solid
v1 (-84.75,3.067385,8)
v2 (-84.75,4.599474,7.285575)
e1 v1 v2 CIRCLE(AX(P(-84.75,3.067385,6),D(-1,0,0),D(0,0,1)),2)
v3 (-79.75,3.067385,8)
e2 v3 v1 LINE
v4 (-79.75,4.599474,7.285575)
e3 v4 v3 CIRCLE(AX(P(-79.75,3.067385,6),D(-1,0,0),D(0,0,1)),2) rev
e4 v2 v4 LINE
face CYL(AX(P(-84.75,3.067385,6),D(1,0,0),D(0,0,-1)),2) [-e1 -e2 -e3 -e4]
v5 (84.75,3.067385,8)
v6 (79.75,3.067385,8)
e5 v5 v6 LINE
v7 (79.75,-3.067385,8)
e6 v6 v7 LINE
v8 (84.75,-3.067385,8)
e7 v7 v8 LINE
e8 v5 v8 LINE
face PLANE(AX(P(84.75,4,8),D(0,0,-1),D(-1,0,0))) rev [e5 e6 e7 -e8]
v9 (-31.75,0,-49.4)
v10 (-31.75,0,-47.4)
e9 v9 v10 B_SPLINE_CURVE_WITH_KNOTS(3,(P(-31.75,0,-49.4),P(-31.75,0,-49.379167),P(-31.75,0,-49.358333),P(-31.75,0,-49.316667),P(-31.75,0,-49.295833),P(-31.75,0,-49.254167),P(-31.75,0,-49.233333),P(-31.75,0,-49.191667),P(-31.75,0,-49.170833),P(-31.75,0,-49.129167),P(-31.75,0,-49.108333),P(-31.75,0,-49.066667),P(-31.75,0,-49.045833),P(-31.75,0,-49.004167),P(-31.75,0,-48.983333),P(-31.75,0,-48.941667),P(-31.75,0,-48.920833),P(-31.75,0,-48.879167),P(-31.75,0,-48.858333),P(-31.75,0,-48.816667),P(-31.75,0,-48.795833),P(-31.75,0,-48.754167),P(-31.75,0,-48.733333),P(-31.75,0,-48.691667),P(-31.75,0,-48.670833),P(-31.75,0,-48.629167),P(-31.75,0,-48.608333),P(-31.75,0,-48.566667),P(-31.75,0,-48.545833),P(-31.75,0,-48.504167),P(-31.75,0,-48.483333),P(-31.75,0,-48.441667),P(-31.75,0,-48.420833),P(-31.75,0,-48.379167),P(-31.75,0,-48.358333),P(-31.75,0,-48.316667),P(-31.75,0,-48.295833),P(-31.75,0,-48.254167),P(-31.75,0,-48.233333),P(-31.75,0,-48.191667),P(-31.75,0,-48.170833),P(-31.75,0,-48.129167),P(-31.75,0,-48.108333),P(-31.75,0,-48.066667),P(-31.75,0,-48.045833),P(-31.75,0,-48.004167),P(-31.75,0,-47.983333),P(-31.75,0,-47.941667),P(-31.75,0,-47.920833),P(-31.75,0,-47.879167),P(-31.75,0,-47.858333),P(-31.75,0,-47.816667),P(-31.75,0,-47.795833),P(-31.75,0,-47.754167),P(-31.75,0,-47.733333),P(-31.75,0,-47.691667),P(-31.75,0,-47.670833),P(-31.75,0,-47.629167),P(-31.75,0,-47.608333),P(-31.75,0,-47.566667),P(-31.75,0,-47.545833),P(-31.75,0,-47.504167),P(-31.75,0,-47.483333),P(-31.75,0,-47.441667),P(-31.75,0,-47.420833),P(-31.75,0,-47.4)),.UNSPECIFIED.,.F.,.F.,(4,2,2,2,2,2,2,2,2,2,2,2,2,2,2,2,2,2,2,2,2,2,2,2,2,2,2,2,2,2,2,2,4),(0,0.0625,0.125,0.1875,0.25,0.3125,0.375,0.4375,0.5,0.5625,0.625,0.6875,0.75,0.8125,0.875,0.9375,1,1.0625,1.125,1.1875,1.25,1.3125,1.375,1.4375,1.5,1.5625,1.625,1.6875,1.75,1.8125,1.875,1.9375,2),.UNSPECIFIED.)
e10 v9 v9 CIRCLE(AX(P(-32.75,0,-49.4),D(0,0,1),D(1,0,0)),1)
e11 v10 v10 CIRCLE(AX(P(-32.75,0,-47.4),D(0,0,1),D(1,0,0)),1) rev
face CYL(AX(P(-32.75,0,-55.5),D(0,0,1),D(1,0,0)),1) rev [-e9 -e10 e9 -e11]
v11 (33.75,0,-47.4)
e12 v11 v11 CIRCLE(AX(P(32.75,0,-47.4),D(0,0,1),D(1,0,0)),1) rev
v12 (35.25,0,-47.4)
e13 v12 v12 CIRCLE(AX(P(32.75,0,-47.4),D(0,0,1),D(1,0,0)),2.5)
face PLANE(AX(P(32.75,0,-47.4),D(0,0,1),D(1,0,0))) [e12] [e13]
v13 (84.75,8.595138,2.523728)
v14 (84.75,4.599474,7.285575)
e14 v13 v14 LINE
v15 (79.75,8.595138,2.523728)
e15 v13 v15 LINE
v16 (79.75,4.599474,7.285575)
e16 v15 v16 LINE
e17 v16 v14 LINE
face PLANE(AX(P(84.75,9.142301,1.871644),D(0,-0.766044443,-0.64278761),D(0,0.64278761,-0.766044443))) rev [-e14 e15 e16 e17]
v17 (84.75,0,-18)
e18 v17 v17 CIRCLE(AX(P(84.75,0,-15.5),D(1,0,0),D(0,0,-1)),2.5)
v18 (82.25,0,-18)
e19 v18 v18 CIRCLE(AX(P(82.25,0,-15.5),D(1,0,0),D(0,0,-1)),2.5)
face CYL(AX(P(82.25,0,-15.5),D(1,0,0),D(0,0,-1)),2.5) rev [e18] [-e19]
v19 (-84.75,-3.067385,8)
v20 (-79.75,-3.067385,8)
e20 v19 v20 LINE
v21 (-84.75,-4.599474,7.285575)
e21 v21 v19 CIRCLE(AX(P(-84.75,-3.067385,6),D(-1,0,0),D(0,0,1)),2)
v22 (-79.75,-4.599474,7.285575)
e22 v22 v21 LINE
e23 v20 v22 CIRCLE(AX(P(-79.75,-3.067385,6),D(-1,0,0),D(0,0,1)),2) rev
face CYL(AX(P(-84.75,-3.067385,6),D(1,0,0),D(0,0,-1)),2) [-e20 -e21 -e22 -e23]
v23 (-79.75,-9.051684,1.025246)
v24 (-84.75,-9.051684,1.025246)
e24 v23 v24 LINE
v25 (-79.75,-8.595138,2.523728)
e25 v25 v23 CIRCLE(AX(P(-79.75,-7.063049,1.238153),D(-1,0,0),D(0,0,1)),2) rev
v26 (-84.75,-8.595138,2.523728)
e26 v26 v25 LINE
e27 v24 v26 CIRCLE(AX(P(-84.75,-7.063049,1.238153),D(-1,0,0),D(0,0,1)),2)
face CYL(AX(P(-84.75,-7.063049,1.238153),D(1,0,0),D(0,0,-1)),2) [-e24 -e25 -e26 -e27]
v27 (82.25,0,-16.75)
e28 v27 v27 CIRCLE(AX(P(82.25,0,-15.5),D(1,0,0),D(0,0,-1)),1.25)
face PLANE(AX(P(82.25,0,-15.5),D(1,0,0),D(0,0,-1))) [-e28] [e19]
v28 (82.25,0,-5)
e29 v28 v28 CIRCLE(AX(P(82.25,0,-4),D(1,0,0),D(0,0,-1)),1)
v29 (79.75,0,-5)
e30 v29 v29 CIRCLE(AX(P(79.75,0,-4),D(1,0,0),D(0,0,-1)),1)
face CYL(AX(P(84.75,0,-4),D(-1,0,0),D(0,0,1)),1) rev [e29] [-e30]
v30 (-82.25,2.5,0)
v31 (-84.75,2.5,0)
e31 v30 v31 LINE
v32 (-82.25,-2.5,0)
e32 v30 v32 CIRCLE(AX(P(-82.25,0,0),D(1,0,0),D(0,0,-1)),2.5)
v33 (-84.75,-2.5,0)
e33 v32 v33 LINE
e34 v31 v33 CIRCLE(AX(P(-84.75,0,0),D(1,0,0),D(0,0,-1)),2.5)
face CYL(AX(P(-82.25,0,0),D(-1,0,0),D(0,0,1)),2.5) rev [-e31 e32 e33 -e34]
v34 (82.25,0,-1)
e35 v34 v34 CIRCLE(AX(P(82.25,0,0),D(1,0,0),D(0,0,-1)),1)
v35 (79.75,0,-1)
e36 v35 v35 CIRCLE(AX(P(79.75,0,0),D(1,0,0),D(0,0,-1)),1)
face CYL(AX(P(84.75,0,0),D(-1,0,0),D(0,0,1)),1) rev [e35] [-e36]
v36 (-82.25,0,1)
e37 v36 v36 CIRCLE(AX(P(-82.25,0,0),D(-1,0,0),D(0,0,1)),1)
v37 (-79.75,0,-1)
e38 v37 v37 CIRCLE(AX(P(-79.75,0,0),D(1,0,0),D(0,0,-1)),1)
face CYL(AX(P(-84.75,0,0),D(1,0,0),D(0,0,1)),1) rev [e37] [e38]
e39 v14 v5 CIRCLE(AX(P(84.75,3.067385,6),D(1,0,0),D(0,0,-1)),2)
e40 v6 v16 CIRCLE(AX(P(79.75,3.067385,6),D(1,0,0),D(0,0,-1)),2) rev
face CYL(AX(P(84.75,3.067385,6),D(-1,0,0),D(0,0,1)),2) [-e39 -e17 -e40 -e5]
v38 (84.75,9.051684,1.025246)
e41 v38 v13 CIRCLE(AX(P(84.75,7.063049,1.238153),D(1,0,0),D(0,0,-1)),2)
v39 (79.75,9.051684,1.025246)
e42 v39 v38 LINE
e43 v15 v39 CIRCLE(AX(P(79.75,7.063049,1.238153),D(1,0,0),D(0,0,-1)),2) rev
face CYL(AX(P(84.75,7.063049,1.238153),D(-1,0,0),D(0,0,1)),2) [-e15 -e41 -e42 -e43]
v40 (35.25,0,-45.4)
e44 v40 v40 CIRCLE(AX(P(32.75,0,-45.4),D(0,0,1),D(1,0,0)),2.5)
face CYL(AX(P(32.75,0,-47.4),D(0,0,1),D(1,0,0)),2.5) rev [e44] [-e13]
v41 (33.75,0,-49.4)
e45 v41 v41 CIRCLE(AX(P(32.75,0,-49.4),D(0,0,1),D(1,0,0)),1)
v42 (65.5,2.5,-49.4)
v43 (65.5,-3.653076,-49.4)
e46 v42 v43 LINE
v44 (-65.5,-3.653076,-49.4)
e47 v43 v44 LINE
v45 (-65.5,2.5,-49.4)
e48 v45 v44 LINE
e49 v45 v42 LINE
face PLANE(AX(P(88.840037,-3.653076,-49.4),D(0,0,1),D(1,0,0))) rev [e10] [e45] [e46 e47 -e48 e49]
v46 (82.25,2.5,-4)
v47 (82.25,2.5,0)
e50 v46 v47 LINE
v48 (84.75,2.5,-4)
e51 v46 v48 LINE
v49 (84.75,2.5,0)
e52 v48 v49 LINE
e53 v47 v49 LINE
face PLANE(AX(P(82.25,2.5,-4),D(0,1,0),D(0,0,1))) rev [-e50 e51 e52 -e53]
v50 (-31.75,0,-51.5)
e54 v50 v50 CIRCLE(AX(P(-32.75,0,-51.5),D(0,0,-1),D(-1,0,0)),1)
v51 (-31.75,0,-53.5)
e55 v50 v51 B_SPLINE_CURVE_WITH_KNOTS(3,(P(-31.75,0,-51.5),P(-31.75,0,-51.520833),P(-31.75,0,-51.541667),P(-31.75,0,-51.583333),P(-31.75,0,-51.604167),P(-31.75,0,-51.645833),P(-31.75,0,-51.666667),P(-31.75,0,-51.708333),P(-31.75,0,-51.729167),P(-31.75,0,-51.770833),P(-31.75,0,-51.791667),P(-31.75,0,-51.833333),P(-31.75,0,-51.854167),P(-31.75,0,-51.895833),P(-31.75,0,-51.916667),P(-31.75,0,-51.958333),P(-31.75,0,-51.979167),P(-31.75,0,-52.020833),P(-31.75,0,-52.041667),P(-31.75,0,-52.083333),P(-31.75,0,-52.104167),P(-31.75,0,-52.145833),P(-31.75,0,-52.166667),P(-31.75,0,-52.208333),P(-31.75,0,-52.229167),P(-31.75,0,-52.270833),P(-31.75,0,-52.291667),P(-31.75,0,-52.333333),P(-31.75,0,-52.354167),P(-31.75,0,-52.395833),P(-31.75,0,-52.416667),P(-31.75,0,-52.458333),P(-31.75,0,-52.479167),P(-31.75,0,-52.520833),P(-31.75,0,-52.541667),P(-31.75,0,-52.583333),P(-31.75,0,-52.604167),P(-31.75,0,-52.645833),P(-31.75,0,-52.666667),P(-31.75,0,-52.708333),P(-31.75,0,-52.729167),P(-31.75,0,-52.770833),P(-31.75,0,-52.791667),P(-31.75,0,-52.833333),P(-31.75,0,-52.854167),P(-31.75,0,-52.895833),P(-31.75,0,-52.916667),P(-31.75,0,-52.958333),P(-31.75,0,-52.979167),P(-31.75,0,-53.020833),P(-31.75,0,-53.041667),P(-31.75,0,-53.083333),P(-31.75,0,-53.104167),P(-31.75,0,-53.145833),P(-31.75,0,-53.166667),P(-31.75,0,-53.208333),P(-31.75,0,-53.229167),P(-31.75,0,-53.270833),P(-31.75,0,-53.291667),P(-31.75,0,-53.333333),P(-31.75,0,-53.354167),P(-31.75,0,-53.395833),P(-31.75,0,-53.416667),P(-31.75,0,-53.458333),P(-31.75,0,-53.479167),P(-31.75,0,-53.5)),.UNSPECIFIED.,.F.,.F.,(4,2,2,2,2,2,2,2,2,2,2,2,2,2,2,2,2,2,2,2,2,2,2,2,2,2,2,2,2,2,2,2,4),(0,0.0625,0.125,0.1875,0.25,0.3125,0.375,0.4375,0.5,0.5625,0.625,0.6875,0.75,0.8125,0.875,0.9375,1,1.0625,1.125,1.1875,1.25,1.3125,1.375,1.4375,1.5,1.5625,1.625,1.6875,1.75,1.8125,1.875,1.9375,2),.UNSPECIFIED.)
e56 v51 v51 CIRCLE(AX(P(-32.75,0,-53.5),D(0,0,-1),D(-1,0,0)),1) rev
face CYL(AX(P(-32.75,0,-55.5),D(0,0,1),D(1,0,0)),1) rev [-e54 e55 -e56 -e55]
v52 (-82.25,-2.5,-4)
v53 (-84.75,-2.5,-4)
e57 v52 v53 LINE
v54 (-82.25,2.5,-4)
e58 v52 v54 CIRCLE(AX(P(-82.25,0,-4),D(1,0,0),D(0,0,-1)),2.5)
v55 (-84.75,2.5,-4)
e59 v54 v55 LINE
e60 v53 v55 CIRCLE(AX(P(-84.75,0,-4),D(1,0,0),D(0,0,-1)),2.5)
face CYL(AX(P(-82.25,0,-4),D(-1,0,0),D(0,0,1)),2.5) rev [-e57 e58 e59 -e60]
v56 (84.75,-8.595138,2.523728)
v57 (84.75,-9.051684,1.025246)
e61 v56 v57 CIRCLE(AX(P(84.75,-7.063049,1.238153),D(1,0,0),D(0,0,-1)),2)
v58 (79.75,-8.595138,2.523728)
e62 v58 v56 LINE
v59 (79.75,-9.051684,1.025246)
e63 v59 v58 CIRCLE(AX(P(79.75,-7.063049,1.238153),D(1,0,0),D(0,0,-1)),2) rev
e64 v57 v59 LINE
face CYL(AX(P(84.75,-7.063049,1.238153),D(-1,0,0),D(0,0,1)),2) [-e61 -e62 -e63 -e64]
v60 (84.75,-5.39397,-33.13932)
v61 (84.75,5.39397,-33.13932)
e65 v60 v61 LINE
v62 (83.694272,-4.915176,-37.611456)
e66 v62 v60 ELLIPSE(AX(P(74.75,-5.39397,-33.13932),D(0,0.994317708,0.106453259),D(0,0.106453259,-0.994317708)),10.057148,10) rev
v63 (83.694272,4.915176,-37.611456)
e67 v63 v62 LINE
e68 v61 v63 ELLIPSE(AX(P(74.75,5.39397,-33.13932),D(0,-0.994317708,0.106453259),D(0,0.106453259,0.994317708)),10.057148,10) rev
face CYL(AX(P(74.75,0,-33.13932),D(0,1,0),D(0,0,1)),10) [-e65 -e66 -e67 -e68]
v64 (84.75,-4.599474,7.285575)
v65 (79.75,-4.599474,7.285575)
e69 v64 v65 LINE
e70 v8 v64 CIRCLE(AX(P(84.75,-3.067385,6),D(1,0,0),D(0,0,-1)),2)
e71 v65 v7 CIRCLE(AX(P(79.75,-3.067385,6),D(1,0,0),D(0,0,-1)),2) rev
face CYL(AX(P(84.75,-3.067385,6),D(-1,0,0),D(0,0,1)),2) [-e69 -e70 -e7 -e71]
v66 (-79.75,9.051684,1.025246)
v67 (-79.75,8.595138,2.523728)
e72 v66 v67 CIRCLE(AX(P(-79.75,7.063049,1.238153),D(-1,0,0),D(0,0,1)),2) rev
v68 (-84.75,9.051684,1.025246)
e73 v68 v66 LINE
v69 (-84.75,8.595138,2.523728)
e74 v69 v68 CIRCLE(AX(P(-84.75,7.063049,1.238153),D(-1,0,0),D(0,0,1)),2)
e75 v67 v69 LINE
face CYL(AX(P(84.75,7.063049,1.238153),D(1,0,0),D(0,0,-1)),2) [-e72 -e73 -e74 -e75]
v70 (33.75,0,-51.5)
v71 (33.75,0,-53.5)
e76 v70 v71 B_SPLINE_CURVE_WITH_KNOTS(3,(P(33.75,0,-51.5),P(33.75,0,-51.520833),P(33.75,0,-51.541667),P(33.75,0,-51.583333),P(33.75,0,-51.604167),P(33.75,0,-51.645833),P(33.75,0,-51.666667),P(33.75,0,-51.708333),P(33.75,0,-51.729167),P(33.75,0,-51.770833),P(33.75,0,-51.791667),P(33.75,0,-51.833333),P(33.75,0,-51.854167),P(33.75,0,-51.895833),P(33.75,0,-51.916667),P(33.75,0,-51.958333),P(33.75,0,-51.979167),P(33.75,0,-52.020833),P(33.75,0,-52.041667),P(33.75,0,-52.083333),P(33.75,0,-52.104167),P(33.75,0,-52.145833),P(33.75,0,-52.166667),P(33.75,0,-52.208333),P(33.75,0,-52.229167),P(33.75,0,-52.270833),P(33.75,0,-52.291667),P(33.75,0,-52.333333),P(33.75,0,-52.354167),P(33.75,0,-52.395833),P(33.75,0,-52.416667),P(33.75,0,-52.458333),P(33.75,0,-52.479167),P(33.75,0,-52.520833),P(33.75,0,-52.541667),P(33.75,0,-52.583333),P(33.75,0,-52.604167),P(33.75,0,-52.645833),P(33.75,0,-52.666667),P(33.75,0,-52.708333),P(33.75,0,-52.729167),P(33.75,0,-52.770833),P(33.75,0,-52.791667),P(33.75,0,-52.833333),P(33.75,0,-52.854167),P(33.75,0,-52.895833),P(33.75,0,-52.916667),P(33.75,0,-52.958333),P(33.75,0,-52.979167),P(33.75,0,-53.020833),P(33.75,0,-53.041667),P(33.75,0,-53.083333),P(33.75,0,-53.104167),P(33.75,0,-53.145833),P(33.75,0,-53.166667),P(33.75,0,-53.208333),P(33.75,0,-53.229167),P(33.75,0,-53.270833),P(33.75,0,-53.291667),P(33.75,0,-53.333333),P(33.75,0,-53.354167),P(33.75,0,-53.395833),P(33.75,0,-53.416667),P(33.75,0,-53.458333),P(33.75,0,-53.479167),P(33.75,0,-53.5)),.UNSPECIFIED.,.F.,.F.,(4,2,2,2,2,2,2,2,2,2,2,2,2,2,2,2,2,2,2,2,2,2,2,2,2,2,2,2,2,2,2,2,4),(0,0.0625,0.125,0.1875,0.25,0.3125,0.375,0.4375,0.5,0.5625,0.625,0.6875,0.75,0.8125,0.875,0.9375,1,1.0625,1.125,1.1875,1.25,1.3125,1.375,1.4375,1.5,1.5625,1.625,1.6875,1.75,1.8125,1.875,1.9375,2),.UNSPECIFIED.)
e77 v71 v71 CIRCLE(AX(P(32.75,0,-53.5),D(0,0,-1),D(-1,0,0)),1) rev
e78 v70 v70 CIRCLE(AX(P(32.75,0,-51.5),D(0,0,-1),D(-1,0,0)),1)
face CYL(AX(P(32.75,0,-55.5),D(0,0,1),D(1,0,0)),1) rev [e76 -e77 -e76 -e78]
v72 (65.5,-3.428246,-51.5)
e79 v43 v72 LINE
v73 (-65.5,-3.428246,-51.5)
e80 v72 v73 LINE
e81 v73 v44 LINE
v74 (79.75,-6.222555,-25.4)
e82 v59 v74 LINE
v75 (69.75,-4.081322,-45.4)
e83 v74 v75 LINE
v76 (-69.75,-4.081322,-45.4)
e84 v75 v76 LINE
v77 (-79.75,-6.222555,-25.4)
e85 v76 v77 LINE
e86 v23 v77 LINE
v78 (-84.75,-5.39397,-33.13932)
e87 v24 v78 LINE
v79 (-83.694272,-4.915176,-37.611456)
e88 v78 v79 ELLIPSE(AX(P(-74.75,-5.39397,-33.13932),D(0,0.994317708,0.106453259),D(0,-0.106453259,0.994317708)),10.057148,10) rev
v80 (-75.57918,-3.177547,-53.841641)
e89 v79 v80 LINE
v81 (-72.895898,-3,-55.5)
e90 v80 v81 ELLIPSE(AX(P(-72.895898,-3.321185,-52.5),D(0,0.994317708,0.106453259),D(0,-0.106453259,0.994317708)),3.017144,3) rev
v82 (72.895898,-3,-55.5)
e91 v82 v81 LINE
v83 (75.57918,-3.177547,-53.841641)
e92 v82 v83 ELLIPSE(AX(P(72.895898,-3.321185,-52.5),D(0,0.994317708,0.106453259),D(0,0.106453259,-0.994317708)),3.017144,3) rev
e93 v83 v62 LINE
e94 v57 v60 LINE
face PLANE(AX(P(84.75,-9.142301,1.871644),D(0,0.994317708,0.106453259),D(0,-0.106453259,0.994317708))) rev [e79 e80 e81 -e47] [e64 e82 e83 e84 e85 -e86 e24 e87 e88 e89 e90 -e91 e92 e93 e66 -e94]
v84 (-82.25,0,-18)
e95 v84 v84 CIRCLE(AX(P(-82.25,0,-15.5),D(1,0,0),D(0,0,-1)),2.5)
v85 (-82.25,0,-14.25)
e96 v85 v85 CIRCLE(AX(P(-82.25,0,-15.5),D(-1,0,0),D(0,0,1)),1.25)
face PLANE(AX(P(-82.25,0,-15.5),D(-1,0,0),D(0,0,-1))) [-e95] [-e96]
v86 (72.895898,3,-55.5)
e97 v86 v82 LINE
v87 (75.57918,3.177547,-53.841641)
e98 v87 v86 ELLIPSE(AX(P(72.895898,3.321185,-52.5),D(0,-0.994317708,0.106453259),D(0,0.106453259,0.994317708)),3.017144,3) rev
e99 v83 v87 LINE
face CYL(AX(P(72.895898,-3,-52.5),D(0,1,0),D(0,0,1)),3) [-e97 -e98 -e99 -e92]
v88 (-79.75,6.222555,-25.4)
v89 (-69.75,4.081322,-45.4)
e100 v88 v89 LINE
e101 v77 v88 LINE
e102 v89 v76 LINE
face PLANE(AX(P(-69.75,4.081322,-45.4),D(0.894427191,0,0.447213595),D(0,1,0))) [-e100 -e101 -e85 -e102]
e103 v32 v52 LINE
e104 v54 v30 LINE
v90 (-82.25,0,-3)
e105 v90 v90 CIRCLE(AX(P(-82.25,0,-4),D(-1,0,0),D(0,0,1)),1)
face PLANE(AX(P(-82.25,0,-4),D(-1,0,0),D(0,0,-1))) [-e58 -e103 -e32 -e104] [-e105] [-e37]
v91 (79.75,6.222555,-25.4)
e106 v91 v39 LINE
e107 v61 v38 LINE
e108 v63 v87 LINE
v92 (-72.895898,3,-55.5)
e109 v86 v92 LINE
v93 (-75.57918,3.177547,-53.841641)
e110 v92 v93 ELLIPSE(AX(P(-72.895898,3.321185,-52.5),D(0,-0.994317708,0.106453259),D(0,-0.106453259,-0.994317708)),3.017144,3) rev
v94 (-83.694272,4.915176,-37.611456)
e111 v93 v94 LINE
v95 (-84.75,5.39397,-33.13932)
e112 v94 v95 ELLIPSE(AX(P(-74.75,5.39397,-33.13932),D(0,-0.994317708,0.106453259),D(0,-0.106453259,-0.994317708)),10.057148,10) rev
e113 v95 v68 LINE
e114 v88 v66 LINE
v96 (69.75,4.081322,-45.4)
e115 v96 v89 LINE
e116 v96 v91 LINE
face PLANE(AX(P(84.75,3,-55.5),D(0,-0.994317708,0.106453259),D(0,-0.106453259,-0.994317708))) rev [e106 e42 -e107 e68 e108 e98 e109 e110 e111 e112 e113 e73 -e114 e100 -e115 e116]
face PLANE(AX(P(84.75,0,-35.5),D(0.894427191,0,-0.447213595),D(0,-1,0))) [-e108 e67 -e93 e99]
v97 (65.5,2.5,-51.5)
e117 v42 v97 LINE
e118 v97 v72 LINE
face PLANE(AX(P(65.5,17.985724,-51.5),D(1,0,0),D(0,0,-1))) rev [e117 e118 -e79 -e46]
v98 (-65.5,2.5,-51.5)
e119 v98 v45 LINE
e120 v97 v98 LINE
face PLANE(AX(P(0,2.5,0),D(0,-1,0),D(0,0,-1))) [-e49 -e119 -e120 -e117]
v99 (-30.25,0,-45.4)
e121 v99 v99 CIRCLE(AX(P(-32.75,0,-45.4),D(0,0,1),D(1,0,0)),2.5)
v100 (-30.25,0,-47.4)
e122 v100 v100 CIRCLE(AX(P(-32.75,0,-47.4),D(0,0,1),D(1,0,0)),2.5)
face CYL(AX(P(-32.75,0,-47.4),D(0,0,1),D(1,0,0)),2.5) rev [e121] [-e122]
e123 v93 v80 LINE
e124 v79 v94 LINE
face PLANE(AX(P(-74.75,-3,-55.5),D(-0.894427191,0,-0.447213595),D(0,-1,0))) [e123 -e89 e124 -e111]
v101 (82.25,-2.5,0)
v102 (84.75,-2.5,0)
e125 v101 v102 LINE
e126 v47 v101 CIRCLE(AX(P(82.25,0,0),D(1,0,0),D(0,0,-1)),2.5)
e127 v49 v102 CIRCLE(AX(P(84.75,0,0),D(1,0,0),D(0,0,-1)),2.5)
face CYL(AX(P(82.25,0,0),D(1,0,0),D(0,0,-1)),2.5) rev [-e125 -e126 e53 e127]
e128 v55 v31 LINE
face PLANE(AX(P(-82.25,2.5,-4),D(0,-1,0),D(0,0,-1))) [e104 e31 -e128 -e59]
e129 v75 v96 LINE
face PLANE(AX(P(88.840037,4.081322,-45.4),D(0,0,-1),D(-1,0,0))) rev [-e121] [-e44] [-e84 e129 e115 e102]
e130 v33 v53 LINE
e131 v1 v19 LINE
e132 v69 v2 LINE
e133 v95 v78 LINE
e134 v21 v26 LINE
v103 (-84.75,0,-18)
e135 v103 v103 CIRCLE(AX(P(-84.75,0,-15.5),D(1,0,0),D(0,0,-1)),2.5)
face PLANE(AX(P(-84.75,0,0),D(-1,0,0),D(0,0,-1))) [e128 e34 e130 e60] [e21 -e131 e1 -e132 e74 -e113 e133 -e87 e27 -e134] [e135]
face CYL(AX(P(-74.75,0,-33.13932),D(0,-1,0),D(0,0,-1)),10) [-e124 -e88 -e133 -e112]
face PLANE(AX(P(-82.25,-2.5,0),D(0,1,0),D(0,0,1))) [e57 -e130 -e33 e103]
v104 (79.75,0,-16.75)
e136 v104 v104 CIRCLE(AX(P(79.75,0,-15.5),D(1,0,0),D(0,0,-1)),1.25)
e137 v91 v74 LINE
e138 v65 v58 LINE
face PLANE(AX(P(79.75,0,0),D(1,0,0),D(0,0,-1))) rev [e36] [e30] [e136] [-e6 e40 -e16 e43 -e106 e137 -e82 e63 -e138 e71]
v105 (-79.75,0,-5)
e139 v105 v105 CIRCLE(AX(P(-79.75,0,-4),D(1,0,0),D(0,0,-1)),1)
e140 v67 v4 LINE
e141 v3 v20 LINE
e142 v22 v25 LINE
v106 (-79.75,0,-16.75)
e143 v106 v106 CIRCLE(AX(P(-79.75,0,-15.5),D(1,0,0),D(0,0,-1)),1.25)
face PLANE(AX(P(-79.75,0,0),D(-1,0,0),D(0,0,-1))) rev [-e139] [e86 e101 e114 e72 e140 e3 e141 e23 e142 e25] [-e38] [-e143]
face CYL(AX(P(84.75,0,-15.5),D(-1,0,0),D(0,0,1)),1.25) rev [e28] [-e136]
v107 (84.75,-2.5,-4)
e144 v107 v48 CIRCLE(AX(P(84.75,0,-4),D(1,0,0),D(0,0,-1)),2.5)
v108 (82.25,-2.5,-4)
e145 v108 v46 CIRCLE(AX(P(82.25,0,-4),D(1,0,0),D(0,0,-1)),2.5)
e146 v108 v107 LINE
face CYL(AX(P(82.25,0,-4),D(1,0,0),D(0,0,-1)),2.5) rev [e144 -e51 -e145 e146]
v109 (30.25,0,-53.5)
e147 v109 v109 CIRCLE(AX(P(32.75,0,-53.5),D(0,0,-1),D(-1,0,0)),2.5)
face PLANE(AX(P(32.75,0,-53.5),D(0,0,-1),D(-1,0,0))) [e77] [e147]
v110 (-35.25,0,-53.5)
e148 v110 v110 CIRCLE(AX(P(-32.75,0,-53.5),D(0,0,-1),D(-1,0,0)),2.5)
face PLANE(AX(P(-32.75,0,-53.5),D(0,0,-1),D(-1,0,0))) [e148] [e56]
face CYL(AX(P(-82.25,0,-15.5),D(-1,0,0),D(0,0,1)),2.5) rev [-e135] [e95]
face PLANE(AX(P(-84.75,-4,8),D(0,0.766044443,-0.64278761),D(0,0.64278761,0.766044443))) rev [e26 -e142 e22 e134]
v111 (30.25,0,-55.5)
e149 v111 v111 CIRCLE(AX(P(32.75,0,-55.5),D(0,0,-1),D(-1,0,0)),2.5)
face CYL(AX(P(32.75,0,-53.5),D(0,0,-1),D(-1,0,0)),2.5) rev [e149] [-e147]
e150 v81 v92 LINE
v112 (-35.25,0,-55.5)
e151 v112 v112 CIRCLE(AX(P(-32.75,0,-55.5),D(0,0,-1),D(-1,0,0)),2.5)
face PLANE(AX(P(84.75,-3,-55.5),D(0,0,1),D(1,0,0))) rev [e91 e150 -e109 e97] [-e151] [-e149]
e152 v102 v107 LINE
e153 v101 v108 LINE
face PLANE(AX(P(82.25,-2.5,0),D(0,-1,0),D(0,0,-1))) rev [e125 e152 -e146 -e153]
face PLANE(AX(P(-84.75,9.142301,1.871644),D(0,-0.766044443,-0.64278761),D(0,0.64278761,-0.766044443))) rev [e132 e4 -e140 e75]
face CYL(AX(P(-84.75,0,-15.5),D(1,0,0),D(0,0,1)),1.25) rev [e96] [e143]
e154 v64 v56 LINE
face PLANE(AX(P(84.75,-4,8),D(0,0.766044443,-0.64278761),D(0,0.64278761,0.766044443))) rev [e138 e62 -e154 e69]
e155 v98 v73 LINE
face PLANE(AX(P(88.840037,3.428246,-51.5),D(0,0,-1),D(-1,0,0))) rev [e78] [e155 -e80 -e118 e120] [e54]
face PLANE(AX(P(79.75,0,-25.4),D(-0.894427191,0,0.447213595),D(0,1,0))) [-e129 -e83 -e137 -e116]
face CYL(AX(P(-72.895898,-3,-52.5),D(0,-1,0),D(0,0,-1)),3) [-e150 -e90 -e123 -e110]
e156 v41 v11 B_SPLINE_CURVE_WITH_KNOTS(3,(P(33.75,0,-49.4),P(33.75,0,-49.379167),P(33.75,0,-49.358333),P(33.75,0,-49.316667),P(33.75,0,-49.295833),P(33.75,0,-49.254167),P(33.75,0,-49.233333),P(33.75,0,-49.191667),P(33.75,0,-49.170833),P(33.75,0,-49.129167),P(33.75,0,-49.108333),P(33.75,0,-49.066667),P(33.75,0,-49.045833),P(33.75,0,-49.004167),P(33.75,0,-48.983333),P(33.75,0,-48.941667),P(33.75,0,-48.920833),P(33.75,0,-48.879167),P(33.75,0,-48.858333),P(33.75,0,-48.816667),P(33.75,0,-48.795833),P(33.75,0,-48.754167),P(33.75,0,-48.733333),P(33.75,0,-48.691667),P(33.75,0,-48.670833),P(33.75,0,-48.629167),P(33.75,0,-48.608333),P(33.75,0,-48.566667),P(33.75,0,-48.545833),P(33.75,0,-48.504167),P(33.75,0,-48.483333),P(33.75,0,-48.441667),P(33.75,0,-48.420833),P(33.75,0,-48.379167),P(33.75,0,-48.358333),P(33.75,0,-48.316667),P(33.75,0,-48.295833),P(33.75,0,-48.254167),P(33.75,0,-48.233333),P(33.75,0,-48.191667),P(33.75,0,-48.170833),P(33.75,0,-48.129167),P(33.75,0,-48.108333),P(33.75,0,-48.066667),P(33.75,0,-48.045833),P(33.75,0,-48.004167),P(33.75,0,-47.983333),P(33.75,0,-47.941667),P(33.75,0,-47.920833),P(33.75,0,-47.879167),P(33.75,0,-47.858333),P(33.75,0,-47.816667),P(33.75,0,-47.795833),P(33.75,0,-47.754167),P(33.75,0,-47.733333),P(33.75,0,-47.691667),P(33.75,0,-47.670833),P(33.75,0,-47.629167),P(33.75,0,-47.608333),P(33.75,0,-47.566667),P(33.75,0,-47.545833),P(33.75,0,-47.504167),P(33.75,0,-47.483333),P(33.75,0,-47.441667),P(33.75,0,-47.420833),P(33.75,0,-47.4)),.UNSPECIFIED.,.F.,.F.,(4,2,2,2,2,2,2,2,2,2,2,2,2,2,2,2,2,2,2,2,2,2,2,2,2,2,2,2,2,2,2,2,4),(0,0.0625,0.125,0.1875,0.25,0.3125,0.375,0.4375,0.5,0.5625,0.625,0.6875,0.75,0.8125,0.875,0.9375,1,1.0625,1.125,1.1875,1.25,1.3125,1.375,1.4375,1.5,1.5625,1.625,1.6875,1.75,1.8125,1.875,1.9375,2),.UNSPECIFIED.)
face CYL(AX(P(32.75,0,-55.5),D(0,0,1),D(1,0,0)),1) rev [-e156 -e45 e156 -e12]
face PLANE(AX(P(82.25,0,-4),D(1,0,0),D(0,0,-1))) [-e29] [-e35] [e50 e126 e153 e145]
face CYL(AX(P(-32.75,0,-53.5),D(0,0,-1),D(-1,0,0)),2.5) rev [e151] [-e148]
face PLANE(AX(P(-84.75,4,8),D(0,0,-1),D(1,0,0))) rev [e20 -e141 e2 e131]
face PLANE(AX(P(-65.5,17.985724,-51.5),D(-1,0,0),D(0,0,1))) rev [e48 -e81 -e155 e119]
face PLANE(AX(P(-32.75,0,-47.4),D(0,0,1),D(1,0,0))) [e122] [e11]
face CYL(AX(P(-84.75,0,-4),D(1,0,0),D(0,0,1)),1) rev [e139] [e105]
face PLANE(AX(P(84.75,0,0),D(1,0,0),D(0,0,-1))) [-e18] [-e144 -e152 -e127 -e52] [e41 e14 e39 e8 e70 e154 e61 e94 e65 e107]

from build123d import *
from OCP.BRepFilletAPI import BRepFilletAPI_MakeChamfer

# Parameters (mm, degrees)
SKETCH4_R                       = 1
SKETCH4_R_2                     = 0.9999999999999998
SKETCH4_R_3                     = 1.250000000000001
BOSS_EXTRUDE1_DEPTH             = 5
BOSS_EXTRUDE2_START             = -79.75
BOSS_EXTRUDE2_DEPTH             = 159.5
BOSS_EXTRUDE3_REACH             = 103.717
SKETCH6_W                       = 14.25
SKETCH6_H                       = 2.1000000000000014
BOSS_EXTRUDE3_DIRECTION_2_REACH = 103.717
SKETCH11_R                      = 0.9999999999999983
CUT_EXTRUDE4_DEPTH              = 101.58679916039975
SKETCH12_R                      = 2.4999999999999982
SKETCH12_R_2                    = 2.500000000000002
CUT_EXTRUDE5_DEPTH              = 2
CUT_EXTRUDE6_START              = -2
SKETCH13_R                      = 2.4999999999999982
SKETCH13_R_2                    = 2.500000000000002
CUT_EXTRUDE6_DEPTH              = 2
CHAMFER3_SIZE                   = 10
CHAMFER3_SIZE2                  = 20
CHAMFER4_SIZE                   = 20
CHAMFER4_SIZE2                  = 10
BOSS_EXTRUDE4_START             = -65.5
BOSS_EXTRUDE4_DEPTH             = 131
SKETCH15_R                      = 2.4999999999999982
CUT_EXTRUDE7_DEPTH              = 2.5
FILLET1_R                       = 2
FILLET2_R                       = 10
FILLET3_R                       = 3


# Read off the part's stored shape, not the designer's step: Boss-Extrude4
with BuildPart() as part:
    # Sketch4 → Boss-Extrude1 (new body)
    with BuildSketch(Plane(origin=(79.75, 0, 0), x_dir=(0, 0, -1), z_dir=(1, 0, 0))):
        Polygon((-7.999999999999998, 4), (-7.999999999999998, -4), (-1.87164445504816, -9.142300877492296), (55.5, -3), (55.5, 3), (-1.8716444550481652, 9.142300877492302), align=None)
        Circle(SKETCH4_R, mode=Mode.SUBTRACT)
        with Locations((4, 0)):
            Circle(SKETCH4_R_2, mode=Mode.SUBTRACT)
        with Locations((15.5, 0)):
            Circle(SKETCH4_R_3, mode=Mode.SUBTRACT)
    extrude(amount=BOSS_EXTRUDE1_DEPTH)


with BuildPart() as body_2:
    # Mirror1: mirrored copy
    add(part.part.mirror(Plane(origin=(0, 0, 0), x_dir=(0, 0, 1), z_dir=(1, 0, 0))))


with BuildPart() as part_1:
    add(part.part)

    add(body_2.part)  # Boss-Extrude2 merges body 2
    # Sketch5 → Boss-Extrude2 (add)
    with BuildSketch(Plane(origin=(0, 0, 0), x_dir=(0, 0, -1), z_dir=(1, 0, 0)).offset(BOSS_EXTRUDE2_START)):
        Polygon((51.49999999999999, 3.428246457694266), (51.49999999999999, -3.428246457694267), (55.5, -3), (55.5, 3), align=None)
        Polygon((45.4, 4.081322305678019), (45.4, -4.081322305678019), (49.39999999999999, -3.6530758479837546), (49.39999999999999, 3.6530758479837546), align=None)
    extrude(amount=BOSS_EXTRUDE2_DEPTH)

    # Boss-Extrude3: up to this plane
    boss_extrude3_end = Plane(origin=(84.75, 3, -55.5), z_dir=(0, -0.9943177075979668, 0.10645325902537786))
    # Sketch6 → Boss-Extrude3 (add, up to the surface)
    with BuildSketch(Plane(origin=(0, 0, 0), x_dir=(1, 0, 0), z_dir=(0, 1, 0)), mode=Mode.PRIVATE) as boss_extrude3_sk1:
        with Locations((-72.625, 50.44999999999999)):
            Rectangle(SKETCH6_W, SKETCH6_H)
    boss_extrude3_tool1 = split(extrude(boss_extrude3_sk1.sketch, amount=BOSS_EXTRUDE3_REACH, mode=Mode.PRIVATE), bisect_by=boss_extrude3_end, keep=Keep.BOTH, mode=Mode.PRIVATE)
    add(boss_extrude3_tool1.solids().sort_by_distance((-72.625, 0, -50.45))[0])
    # Sketch6 → Boss-Extrude3 (add, up to the surface)
    with BuildSketch(Plane(origin=(0, 0, 0), x_dir=(1, 0, 0), z_dir=(0, 1, 0)), mode=Mode.PRIVATE) as boss_extrude3_sk2:
        Polygon((65.5, 49.400000000000006), (79.75, 49.39999999999999), (79.75, 51.49999999999999), (65.5, 51.50000000000001), align=None)
    boss_extrude3_tool2 = split(extrude(boss_extrude3_sk2.sketch, amount=BOSS_EXTRUDE3_REACH, mode=Mode.PRIVATE), bisect_by=boss_extrude3_end, keep=Keep.BOTH, mode=Mode.PRIVATE)
    add(boss_extrude3_tool2.solids().sort_by_distance((72.625, 0, -50.45))[0])

    # Boss-Extrude3 direction 2: up to this plane
    boss_extrude3_direction_2_end = Plane(origin=(84.75, -9.142300877492296, 1.87164445504816), z_dir=(0, 0.9943177075979668, 0.10645325902537779))
    # Sketch6 → Boss-Extrude3 direction 2 (add, up to the surface)
    with BuildSketch(Plane(origin=(0, 0, 0), x_dir=(1, 0, 0), z_dir=(0, 1, 0)), mode=Mode.PRIVATE) as boss_extrude3_direction_2_sk1:
        with Locations((-72.625, 50.44999999999999)):
            Rectangle(SKETCH6_W, SKETCH6_H)
    boss_extrude3_direction_2_tool1 = split(extrude(boss_extrude3_direction_2_sk1.sketch, amount=-BOSS_EXTRUDE3_DIRECTION_2_REACH, mode=Mode.PRIVATE), bisect_by=boss_extrude3_direction_2_end, keep=Keep.BOTH, mode=Mode.PRIVATE)
    add(boss_extrude3_direction_2_tool1.solids().sort_by_distance((-72.625, 0, -50.45))[0])
    # Sketch6 → Boss-Extrude3 direction 2 (add, up to the surface)
    with BuildSketch(Plane(origin=(0, 0, 0), x_dir=(1, 0, 0), z_dir=(0, 1, 0)), mode=Mode.PRIVATE) as boss_extrude3_direction_2_sk2:
        Polygon((65.5, 49.400000000000006), (79.75, 49.39999999999999), (79.75, 51.49999999999999), (65.5, 51.50000000000001), align=None)
    boss_extrude3_direction_2_tool2 = split(extrude(boss_extrude3_direction_2_sk2.sketch, amount=-BOSS_EXTRUDE3_DIRECTION_2_REACH, mode=Mode.PRIVATE), bisect_by=boss_extrude3_direction_2_end, keep=Keep.BOTH, mode=Mode.PRIVATE)
    add(boss_extrude3_direction_2_tool2.solids().sort_by_distance((72.625, 0, -50.45))[0])

    # Sketch11 → Cut-Extrude4 (cut, through all)
    with BuildSketch(Plane.XY.offset(-45.4)):
        with Locations((-32.75, -1.61e-15)):
            Circle(SKETCH11_R)
        with Locations((32.75, 2.4e-15)):
            Circle(SKETCH11_R)
    extrude(amount=-CUT_EXTRUDE4_DEPTH, mode=Mode.SUBTRACT)

    # Sketch12 → Cut-Extrude5 (cut)
    with BuildSketch(Plane.XY.offset(-45.4)):
        with Locations((-32.75, -1.73e-15)):
            Circle(SKETCH12_R)
        with Locations((32.75, 3.47e-15)):
            Circle(SKETCH12_R_2)
    extrude(amount=-CUT_EXTRUDE5_DEPTH, mode=Mode.SUBTRACT)

    # Sketch13 → Cut-Extrude6 (cut)
    with BuildSketch(Plane(origin=(0, 0, -55.5), x_dir=(-1, 0, 0), z_dir=(0, 0, -1)).offset(CUT_EXTRUDE6_START)):
        with Locations(Location((-32.75, 3.47e-15, 0), (0, 0, 180))):
            Circle(SKETCH13_R)
        with Locations(Location((32.75, 0, 0), (0, 0, 180))):
            Circle(SKETCH13_R_2)
    extrude(amount=CUT_EXTRUDE6_DEPTH, mode=Mode.SUBTRACT)

    # Chamfer3: one chamfer whose edges measure the first distance from different faces: ONE call of the kernel's chamfer builder (chamfer() names one face for all edges)
    chamfer3_edges_1 = [part_1.edges().sort_by_distance(p)[0] for p in [
        (84.75, 0, -55.5),
    ]]
    chamfer3_side_1 = [part_1.faces().sort_by_distance(p)[0] for p in [
        (6.55e-15, -1.2e-16, -55.5),
    ]]
    chamfer3_edges_2 = [part_1.edges().sort_by_distance(p)[0] for p in [
        (79.75, 0, -45.4),
    ]]
    chamfer3_side_2 = [part_1.faces().sort_by_distance(p)[0] for p in [
        (3.3e-16, 1.1e-16, -45.4),
    ]]
    chamfer3 = BRepFilletAPI_MakeChamfer(part_1.part.solid().wrapped)
    for e in chamfer3_edges_1:
        chamfer3.Add(CHAMFER3_SIZE, CHAMFER3_SIZE2, e.wrapped, chamfer3_side_1[0].wrapped)  # the first distance lies on this face
    for e in chamfer3_edges_2:
        chamfer3.Add(CHAMFER3_SIZE, CHAMFER3_SIZE2, e.wrapped, chamfer3_side_2[0].wrapped)  # the first distance lies on this face
    add(Compound.cast(chamfer3.Shape()), mode=Mode.REPLACE)

    # Chamfer4: one chamfer whose edges measure the first distance from different faces: ONE call of the kernel's chamfer builder (chamfer() names one face for all edges)
    chamfer4_edges_1 = [part_1.edges().sort_by_distance(p)[0] for p in [
        (-79.75, 0, -45.4),
    ]]
    chamfer4_side_1 = [part_1.faces().sort_by_distance(p)[0] for p in [
        (-79.75, 6.138766924124398, 4.573009379877834),
    ]]
    chamfer4_edges_2 = [part_1.edges().sort_by_distance(p)[0] for p in [
        (-84.75, 0, -55.5),
    ]]
    chamfer4_side_2 = [part_1.faces().sort_by_distance(p)[0] for p in [
        (-84.75, 2.08e-15, -19.394723563601886),
    ]]
    chamfer4 = BRepFilletAPI_MakeChamfer(part_1.part.solid().wrapped)
    for e in chamfer4_edges_1:
        chamfer4.Add(CHAMFER4_SIZE, CHAMFER4_SIZE2, e.wrapped, chamfer4_side_1[0].wrapped)  # the first distance lies on this face
    for e in chamfer4_edges_2:
        chamfer4.Add(CHAMFER4_SIZE, CHAMFER4_SIZE2, e.wrapped, chamfer4_side_2[0].wrapped)  # the first distance lies on this face
    add(Compound.cast(chamfer4.Shape()), mode=Mode.REPLACE)

    # Boss-Extrude4 outline → Boss-Extrude4 (add)
    with BuildSketch(Plane.YZ.offset(BOSS_EXTRUDE4_START)):
        Polygon((3.428246458, -51.5), (3.653075848, -49.4), (2.5, -49.4), (2.5, -51.5), align=None)
    extrude(amount=BOSS_EXTRUDE4_DEPTH)

    # Sketch15 → Cut-Extrude7 (cut)
    with BuildSketch(Plane(origin=(84.75, 0, 0), x_dir=(0, 0, -1), z_dir=(1, 0, 0))):
        with Locations((15.5, 0)):
            Circle(SKETCH15_R)
        with BuildLine():
            Line((4, 2.5), (0, 2.5))
            ThreePointArc((0, 2.5), (-2.5, 3.1e-16), (0, -2.5))
            Line((0, -2.5), (4, -2.5))
            ThreePointArc((4, -2.5), (6.5, 0), (4, 2.5))
        make_face()
    cut_extrude7 = extrude(amount=-CUT_EXTRUDE7_DEPTH, mode=Mode.SUBTRACT)

    # Mirror2: Cut-Extrude7 across plane
    add(cut_extrude7.mirror(Plane(origin=(0, 0, 0), x_dir=(0, 0, 1), z_dir=(1, 0, 0))), mode=Mode.SUBTRACT)

    # Fillet1
    fillet1_edges = [part_1.edges().sort_by_distance(p)[0] for p in [
        (82.25, 9.142300877492302, 1.8716444550481652),
        (82.25, -9.142300877492296, 1.87164445504816),
        (82.25, -4, 7.999999999999998),
        (82.25, 4, 7.999999999999998),
        (-82.25, 4, 7.999999999999998),
        (-82.25, -4, 7.999999999999998),
        (-82.25, -9.142300877492296, 1.87164445504816),
        (-82.25, 9.142300877492302, 1.8716444550481652),
    ]]
    fillet(fillet1_edges, radius=FILLET1_R)

    # Fillet2
    fillet2_edges = [part_1.edges().sort_by_distance(p)[0] for p in [
        (84.75, 8.9e-16, -35.5),
        (-84.75, 8.9e-16, -35.5),
    ]]
    fillet(fillet2_edges, radius=FILLET2_R)

    # Fillet3
    fillet3_edges = [part_1.edges().sort_by_distance(p)[0] for p in [
        (74.75, 0, -55.5),
        (-74.75, 0, -55.5),
    ]]
    fillet(fillet3_edges, radius=FILLET3_R)


solid = part_1.part
